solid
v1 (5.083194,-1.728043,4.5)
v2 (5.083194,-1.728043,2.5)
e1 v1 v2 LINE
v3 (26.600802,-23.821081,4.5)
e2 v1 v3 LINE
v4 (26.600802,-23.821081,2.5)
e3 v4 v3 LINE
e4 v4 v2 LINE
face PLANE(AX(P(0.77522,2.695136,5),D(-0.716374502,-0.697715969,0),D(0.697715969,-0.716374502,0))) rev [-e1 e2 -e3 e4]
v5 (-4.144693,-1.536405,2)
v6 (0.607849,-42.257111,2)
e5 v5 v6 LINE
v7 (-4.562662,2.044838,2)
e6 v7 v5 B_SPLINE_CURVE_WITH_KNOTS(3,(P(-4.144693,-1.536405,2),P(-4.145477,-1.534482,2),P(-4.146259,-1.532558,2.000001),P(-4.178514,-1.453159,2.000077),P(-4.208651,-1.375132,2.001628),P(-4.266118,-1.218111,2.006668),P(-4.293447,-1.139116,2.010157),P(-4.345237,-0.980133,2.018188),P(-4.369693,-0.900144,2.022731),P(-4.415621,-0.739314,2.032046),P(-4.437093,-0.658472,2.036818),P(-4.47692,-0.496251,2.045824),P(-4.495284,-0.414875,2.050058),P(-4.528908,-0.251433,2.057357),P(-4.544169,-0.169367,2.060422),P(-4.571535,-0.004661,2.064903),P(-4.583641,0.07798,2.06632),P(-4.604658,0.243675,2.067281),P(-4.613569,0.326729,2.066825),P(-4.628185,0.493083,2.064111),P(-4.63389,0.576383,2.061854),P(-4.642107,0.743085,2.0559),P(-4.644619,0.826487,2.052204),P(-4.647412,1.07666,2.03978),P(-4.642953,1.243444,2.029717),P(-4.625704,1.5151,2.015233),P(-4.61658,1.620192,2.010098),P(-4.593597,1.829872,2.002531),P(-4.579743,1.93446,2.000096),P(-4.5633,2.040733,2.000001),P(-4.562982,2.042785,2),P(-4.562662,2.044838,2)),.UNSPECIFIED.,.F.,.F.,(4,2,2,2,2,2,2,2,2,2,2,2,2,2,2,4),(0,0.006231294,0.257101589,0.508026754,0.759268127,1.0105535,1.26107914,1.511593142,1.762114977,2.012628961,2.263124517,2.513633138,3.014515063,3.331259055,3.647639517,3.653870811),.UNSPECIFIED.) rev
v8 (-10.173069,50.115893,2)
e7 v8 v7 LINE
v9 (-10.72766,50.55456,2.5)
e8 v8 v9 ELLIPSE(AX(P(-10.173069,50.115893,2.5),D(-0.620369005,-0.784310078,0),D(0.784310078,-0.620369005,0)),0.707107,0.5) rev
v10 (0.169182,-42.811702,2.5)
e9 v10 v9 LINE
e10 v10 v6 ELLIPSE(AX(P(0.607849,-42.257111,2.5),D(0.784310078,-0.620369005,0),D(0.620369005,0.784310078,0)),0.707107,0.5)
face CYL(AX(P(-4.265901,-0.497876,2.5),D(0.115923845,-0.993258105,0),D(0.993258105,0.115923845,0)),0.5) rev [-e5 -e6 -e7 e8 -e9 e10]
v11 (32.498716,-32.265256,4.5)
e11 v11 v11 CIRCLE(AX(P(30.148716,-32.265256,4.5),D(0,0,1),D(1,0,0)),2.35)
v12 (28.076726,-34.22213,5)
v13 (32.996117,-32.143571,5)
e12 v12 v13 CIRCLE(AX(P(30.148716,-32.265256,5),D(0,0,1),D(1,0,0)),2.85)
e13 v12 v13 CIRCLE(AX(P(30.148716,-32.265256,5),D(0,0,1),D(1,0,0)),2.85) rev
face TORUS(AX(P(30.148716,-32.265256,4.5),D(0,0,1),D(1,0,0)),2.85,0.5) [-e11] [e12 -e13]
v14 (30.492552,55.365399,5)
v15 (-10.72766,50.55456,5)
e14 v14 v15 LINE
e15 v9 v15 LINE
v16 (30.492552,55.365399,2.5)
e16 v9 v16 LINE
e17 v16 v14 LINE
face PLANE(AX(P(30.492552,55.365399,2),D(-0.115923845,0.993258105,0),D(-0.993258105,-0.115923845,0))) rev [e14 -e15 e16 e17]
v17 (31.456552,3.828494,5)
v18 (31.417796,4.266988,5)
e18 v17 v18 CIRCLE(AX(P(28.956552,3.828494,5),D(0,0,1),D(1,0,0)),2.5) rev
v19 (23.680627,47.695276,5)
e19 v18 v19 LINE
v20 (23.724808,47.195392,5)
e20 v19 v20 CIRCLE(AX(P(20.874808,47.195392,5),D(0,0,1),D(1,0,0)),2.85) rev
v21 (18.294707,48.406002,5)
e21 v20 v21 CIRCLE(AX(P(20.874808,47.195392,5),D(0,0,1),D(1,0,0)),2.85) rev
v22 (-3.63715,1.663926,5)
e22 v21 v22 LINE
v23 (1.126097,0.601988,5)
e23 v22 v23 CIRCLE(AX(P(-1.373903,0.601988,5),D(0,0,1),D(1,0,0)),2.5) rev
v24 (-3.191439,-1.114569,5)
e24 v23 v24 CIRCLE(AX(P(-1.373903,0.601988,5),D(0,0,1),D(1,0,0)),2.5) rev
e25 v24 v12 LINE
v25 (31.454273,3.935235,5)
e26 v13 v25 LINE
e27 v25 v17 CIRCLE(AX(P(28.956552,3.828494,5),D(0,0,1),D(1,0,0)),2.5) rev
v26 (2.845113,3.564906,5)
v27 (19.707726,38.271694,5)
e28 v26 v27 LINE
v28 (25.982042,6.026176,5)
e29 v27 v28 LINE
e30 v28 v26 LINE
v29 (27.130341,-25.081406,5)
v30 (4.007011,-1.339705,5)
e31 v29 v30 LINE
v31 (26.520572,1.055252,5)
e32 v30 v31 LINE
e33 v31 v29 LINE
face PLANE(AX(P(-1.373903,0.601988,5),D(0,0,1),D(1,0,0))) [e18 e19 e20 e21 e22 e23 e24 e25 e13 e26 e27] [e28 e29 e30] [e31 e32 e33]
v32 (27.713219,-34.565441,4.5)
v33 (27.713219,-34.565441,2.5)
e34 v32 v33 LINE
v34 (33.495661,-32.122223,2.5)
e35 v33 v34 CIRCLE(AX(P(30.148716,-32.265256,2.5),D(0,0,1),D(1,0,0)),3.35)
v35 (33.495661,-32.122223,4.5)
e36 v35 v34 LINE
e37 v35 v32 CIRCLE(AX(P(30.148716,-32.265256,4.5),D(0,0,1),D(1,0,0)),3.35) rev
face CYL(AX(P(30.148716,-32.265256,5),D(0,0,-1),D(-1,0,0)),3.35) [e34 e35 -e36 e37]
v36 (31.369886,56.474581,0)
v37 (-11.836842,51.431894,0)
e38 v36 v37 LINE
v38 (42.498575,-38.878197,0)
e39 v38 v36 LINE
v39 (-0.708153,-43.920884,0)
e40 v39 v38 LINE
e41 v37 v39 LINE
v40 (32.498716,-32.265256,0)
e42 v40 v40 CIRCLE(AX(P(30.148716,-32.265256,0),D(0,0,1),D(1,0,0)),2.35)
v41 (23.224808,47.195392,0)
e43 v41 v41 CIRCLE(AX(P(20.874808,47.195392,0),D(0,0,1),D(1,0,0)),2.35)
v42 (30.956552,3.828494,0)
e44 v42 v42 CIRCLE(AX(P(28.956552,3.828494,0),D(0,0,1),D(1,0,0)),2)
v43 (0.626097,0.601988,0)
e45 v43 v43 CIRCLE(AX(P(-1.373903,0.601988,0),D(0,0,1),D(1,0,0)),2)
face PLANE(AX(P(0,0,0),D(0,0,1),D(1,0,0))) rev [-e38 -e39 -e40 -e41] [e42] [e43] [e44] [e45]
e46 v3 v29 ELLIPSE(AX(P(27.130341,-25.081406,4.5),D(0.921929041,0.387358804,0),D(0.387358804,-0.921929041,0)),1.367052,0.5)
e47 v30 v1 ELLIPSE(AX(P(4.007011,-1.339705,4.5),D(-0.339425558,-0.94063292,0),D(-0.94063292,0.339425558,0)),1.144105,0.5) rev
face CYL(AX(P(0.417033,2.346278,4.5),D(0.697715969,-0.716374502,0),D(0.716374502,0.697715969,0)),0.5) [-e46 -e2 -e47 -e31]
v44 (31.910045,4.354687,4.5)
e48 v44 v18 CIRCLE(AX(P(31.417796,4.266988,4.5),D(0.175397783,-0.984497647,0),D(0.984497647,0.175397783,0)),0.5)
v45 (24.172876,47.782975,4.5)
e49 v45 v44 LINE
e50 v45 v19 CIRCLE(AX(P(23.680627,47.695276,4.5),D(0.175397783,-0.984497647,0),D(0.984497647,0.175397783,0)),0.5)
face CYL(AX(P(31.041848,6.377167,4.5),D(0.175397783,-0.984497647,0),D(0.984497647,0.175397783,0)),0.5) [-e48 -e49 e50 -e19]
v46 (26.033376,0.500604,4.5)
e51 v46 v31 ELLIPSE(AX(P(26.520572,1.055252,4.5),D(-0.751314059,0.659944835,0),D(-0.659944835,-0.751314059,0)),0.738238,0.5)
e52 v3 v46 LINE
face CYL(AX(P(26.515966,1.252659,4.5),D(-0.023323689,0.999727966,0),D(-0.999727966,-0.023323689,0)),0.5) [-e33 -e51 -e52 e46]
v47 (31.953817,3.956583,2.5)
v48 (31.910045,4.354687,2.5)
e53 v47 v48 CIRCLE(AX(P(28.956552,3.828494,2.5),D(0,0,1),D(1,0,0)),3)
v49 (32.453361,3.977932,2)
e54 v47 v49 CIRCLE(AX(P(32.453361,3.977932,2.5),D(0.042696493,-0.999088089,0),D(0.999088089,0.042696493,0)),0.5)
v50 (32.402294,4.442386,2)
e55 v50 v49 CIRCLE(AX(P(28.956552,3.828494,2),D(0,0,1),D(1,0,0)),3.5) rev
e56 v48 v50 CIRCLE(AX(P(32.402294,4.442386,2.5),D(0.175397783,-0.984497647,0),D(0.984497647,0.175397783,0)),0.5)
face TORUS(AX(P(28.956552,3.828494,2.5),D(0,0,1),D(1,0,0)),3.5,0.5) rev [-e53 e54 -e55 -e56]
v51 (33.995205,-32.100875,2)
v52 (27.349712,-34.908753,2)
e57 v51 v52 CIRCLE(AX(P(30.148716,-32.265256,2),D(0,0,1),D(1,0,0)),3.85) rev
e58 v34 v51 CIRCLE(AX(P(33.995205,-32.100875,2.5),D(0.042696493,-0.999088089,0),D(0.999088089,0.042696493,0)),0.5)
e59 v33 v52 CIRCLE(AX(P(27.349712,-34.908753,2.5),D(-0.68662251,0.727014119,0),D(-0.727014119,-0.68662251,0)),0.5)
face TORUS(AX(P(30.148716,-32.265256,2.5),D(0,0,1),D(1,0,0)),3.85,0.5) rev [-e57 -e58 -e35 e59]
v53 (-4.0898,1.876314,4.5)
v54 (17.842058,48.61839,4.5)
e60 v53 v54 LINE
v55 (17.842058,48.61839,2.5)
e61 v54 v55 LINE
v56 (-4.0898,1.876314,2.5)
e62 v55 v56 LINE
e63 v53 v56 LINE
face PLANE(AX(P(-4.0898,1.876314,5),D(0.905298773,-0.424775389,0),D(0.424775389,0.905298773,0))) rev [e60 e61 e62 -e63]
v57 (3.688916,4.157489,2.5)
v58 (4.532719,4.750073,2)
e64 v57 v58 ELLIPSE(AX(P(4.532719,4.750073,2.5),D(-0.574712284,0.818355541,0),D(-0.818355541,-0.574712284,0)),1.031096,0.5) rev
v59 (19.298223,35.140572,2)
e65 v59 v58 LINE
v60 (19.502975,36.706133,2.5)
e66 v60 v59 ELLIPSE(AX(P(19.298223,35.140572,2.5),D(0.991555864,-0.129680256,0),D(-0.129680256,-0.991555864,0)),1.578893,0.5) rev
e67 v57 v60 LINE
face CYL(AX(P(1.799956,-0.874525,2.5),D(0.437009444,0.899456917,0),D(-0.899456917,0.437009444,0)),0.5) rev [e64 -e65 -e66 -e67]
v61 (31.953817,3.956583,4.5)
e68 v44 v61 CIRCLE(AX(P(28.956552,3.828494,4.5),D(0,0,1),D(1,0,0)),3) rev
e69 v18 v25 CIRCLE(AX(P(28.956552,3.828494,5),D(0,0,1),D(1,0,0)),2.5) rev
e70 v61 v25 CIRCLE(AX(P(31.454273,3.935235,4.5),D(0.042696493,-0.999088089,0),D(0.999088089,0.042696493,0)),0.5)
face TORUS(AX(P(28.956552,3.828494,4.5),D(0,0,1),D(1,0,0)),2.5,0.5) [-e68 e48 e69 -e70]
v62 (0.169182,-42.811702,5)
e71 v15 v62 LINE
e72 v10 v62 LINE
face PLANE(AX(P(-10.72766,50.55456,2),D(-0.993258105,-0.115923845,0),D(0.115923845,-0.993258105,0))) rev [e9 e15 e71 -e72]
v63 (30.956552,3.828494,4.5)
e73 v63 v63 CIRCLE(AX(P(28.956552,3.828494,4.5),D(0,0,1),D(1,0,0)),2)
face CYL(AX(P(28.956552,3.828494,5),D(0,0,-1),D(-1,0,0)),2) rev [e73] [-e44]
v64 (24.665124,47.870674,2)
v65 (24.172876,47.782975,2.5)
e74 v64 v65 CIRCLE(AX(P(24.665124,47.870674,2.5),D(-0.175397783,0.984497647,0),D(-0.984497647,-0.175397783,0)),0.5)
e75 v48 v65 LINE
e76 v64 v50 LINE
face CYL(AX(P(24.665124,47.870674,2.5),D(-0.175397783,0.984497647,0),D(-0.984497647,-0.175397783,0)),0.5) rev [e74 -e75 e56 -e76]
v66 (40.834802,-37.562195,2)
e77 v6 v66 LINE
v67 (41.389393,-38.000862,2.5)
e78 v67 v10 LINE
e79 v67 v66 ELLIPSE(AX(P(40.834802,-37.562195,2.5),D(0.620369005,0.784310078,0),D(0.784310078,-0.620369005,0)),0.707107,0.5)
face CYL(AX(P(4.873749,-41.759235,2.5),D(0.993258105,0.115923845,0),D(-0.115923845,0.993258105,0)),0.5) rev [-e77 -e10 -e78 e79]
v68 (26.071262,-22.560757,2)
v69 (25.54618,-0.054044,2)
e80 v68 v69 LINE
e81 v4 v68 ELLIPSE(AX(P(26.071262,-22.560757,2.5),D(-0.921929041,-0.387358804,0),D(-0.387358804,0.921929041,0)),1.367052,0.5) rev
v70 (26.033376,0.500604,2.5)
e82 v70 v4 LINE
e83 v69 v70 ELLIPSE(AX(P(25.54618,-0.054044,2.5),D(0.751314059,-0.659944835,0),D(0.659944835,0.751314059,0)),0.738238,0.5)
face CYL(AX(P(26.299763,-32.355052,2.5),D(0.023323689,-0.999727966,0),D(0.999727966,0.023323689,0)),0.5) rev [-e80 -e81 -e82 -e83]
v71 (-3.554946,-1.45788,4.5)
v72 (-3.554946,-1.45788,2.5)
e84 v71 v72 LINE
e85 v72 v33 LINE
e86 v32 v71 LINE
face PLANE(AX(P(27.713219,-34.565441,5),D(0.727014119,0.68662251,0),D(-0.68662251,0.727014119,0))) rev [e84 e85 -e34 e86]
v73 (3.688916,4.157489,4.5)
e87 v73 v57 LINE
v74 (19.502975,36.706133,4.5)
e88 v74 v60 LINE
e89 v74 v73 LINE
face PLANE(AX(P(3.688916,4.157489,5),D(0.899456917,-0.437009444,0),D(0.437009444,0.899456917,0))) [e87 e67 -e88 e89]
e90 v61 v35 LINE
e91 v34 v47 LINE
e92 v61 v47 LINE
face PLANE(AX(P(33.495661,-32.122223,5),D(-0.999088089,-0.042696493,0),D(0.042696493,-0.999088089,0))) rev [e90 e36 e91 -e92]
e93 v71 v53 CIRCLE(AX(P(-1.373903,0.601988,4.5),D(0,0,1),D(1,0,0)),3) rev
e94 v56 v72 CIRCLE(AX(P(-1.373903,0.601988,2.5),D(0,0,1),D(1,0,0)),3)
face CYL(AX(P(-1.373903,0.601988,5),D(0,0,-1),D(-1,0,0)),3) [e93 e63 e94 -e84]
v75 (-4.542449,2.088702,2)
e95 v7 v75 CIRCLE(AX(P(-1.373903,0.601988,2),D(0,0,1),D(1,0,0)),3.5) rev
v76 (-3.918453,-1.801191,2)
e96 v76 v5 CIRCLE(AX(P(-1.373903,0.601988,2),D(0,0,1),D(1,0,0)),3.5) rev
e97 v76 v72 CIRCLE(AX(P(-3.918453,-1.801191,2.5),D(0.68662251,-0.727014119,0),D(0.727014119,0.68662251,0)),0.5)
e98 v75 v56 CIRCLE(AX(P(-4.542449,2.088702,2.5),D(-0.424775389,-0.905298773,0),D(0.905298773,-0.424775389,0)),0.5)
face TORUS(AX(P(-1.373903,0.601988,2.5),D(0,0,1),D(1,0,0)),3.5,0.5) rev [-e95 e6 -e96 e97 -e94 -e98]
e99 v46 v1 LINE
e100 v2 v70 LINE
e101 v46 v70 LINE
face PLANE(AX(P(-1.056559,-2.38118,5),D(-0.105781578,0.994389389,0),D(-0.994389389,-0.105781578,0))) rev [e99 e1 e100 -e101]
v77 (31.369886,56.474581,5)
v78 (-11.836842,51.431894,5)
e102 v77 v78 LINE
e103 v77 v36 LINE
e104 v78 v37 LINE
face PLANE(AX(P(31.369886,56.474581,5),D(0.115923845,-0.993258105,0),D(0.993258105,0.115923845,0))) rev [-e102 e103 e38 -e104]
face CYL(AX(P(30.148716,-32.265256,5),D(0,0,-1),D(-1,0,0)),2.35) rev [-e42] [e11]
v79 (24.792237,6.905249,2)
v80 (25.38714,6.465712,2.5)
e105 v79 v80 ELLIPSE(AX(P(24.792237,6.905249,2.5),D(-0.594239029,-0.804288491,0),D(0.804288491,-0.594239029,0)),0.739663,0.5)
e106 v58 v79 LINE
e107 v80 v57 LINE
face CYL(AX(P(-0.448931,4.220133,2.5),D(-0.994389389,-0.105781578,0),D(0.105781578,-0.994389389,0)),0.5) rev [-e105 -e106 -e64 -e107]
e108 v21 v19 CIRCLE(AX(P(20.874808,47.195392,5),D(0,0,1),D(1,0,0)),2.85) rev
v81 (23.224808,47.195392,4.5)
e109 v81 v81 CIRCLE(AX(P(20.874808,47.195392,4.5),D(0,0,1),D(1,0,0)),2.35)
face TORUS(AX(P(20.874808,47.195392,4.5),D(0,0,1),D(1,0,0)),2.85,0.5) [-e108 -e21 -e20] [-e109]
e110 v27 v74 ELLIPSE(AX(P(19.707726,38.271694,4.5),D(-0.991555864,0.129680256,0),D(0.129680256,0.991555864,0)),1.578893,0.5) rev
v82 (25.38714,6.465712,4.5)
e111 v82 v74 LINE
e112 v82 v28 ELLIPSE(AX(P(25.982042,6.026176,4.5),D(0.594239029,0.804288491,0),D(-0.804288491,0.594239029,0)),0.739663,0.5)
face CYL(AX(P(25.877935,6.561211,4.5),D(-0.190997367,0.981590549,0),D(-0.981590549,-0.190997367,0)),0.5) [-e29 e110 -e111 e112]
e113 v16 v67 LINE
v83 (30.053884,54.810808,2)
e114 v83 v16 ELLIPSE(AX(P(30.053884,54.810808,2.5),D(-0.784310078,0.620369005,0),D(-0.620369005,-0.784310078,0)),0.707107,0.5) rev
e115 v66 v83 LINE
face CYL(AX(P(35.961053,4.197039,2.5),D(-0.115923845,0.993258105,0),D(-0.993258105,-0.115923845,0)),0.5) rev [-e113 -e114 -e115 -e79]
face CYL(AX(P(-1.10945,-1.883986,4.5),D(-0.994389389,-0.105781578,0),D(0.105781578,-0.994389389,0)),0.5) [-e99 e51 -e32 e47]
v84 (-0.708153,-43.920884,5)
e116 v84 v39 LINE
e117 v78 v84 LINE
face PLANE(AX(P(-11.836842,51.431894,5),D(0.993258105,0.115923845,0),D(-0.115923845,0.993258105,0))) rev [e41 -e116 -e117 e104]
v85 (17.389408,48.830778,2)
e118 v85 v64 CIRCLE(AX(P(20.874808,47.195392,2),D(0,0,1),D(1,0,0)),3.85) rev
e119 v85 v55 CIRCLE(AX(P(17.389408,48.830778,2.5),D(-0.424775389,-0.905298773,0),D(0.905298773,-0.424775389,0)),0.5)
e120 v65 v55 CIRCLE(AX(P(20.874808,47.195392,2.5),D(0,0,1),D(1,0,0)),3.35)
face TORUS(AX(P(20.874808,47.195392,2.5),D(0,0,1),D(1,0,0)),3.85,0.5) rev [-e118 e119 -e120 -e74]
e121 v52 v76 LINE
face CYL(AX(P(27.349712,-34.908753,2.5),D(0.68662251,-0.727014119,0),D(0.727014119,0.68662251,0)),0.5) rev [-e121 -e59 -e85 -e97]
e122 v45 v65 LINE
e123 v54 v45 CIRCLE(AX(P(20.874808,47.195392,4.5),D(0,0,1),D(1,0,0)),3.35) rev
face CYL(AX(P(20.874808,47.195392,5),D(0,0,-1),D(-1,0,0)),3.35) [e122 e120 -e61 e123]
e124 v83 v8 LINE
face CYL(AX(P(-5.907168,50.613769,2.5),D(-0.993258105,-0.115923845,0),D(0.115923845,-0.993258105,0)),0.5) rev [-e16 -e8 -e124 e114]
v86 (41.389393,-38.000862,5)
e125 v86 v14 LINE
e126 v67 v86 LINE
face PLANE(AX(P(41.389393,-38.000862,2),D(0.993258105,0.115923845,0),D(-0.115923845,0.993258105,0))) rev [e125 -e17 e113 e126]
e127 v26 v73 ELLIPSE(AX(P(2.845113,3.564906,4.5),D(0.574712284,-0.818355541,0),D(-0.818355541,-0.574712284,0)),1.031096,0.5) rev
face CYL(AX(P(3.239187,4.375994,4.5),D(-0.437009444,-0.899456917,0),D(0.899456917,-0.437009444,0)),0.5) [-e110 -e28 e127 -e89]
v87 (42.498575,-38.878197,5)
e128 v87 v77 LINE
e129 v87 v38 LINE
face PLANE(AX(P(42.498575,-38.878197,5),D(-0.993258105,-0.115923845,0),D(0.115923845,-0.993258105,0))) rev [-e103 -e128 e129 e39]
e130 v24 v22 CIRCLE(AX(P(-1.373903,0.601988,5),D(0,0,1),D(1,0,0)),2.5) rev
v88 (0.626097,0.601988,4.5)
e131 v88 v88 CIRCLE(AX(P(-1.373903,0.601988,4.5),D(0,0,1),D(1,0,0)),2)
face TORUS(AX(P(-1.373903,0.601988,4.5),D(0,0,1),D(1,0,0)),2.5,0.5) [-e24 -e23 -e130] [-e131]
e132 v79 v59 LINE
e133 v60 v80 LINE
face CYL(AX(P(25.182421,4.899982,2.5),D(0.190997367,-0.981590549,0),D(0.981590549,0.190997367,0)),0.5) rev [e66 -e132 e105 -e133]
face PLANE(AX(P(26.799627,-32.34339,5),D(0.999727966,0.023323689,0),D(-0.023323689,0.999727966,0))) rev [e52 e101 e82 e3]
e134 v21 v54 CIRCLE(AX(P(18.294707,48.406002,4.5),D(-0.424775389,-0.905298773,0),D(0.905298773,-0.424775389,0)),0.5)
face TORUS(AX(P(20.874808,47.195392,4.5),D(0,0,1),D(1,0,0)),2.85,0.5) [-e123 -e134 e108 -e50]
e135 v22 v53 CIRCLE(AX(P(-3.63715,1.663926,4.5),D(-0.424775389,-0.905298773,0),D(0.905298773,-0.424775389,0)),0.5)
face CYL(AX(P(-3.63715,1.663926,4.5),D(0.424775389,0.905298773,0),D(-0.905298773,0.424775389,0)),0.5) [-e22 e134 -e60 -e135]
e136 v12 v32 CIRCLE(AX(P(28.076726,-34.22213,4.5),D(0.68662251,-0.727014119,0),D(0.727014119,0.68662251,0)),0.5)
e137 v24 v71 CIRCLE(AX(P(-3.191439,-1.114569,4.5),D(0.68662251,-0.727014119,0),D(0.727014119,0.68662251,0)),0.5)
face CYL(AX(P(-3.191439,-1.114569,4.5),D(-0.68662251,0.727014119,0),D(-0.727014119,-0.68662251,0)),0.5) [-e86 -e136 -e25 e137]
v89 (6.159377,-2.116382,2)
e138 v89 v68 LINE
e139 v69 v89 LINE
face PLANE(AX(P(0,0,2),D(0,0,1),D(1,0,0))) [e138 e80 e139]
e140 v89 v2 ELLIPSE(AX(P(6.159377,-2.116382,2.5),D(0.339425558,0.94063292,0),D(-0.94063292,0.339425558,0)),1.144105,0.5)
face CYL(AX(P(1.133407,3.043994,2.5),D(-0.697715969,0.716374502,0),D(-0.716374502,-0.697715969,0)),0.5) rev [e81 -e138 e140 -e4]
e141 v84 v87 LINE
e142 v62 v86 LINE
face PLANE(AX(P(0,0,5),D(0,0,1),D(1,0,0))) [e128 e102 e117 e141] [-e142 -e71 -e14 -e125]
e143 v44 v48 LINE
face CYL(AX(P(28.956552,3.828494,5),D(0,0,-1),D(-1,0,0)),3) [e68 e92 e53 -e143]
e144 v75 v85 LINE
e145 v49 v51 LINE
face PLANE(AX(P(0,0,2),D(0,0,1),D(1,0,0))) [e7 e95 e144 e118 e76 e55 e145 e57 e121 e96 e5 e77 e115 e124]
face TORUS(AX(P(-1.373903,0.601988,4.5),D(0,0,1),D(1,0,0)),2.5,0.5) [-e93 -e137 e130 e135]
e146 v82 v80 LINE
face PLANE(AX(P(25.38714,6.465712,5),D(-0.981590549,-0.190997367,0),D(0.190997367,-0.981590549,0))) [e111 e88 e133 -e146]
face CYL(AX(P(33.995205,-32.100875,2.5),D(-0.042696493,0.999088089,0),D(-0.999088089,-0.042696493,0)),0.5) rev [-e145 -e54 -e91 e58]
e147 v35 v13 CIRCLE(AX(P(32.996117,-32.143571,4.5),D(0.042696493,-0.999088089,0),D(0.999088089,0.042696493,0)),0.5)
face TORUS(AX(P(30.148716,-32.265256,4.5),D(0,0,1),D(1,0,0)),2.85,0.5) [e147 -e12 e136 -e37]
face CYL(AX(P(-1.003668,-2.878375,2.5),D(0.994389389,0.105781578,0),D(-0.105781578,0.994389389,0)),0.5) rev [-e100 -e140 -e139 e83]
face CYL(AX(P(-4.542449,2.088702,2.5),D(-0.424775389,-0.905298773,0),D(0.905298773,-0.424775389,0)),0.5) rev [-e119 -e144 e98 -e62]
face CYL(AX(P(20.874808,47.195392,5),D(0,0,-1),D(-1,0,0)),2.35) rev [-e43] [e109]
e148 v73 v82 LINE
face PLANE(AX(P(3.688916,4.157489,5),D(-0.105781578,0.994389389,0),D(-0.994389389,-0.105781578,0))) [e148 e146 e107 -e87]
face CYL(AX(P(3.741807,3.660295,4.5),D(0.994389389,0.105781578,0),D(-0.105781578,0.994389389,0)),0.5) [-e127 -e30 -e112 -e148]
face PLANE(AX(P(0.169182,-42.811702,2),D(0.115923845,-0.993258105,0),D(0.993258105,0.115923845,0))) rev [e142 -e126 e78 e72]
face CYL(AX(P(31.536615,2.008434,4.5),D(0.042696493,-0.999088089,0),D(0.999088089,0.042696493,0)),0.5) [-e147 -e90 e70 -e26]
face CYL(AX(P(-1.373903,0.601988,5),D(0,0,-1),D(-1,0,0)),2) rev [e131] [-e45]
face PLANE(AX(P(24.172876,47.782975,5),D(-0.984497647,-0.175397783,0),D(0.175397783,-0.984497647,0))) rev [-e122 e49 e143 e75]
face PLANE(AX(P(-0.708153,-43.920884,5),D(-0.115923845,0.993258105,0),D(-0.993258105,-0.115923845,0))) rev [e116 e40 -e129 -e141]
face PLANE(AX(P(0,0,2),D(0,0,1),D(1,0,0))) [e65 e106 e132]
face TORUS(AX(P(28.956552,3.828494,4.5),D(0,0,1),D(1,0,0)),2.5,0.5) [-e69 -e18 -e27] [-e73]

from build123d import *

# Parameters (mm, degrees)
ESQUISSE1_R             = 2
ESQUISSE1_R_2           = 2.35
BOSS_EXTRU_1_DEPTH      = 5
ENL_V_MAT_EXTRU_1_DEPTH = 3
ESQUISSE4_R             = 3
ESQUISSE4_R_2           = 2
ESQUISSE4_R_3           = 3.35
ESQUISSE4_R_4           = 2.35
BOSS_EXTRU_3_DEPTH      = 3
BOSS_EXTRU_4_DEPTH      = 3
ESQUISSE6_R             = 2.5
BOSS_EXTRU_7_DEPTH      = 3
CONG_1_R                = 0.5
CONG_2_R                = 0.5
CONG_3_R                = 0.5
CONG_4_R                = 0.5


# Some blends are built 0.0001 mm under size
with BuildPart() as part:
    # Esquisse1 → Boss.-Extru.1 (new body)
    with BuildSketch(Plane.XY):
        Polygon((31.369885856, 56.474581367), (-11.836841692, 51.431894124), (-0.708152605, -43.920883912), (42.498574943, -38.87819667), align=None)
        with Locations((-1.373903483, 0.601987724)):
            Circle(ESQUISSE1_R, mode=Mode.SUBTRACT)
        with Locations((28.956552282, 3.828493866)):
            Circle(ESQUISSE1_R, mode=Mode.SUBTRACT)
        with Locations((20.874808411, 47.195392317)):
            Circle(ESQUISSE1_R_2, mode=Mode.SUBTRACT)
        with Locations((30.148715983, -32.265256047)):
            Circle(ESQUISSE1_R_2, mode=Mode.SUBTRACT)
    extrude(amount=BOSS_EXTRU_1_DEPTH)

    # Esquisse3 → Enlèv. mat.-Extru.1 (cut)
    with BuildSketch(Plane.XY.offset(5)):
        Polygon((0.169181655, -42.811701963), (41.389392993, -38.00086241), (30.492551596, 55.365399417), (-10.727659743, 50.554559864), align=None)
    extrude(amount=-ENL_V_MAT_EXTRU_1_DEPTH, mode=Mode.SUBTRACT)

    # Esquisse4 → Boss.-Extru.3 (add)
    # profile 1 of 4: a face of its own
    with BuildSketch(Plane.XY.offset(2)):
        with Locations((-1.373903483, 0.601987724)):
            Circle(ESQUISSE4_R)
        with Locations((-1.373903483, 0.601987724)):
            Circle(ESQUISSE4_R_2, mode=Mode.SUBTRACT)
    # profile 2 of 4: a face of its own
    with BuildSketch(Plane.XY.offset(2)):
        with Locations((30.148715983, -32.265256047)):
            Circle(ESQUISSE4_R_3)
        with Locations((30.148715983, -32.265256047)):
            Circle(ESQUISSE4_R_4, mode=Mode.SUBTRACT)
    # profile 3 of 4: a face of its own
    with BuildSketch(Plane.XY.offset(2)):
        with Locations((28.956552282, 3.828493866)):
            Circle(ESQUISSE4_R)
        with Locations((28.956552282, 3.828493866)):
            Circle(ESQUISSE4_R_2, mode=Mode.SUBTRACT)
    # profile 4 of 4: a face of its own
    with BuildSketch(Plane.XY.offset(2)):
        with Locations((20.874808411, 47.195392317)):
            Circle(ESQUISSE4_R_3)
        with Locations((20.874808411, 47.195392317)):
            Circle(ESQUISSE4_R_4, mode=Mode.SUBTRACT)
    extrude(amount=BOSS_EXTRU_3_DEPTH)

    # Esquisse5 → Boss.-Extru.4 (add)
    with BuildSketch(Plane.XY.offset(2)):
        with BuildLine():
            Line((27.713218685, -34.565441455), (-3.554945839, -1.457879806))
            ThreePointArc((-3.554945839, -1.457879806), (0.702665564, -1.563159152), (0.775220023, 2.695135629))
            Line((0.775220023, 2.695135629), (32.548570565, -29.927907552))
            ThreePointArc((32.548570565, -29.927907552), (27.829880548, -29.847508702), (27.713218685, -34.565441455))
        make_face()
    extrude(amount=BOSS_EXTRU_4_DEPTH)

    # Esquisse6 → Boss.-Extru.7 (add)
    with BuildSketch(Plane.XY.offset(2)):
        with BuildLine():
            Line((33.495661081, -32.122222794), (31.953816549, 3.956583346))
            Line((31.953816549, 3.956583346), (31.910045224, 4.354687214))
            Line((31.910045224, 4.354687214), (24.17287553, 47.782974889))
            ThreePointArc((24.17287553, 47.782974889), (20.436541684, 43.874184362), (17.842057521, 48.618389871))
            Line((17.842057521, 48.618389871), (-4.089799802, 1.876313892))
            ThreePointArc((-4.089799802, 1.876313892), (1.069419445, 2.342726954), (-1.056558749, -2.381180445))
            Line((-1.056558749, -2.381180445), (26.033375742, 0.500604146))
            Line((26.033375742, 0.500604146), (26.799627298, -32.343390404))
            ThreePointArc((26.799627298, -32.343390404), (30.038126984, -28.917081907), (33.495661081, -32.122222794))
        make_face()
        with Locations((28.956552282, 3.828493866)):
            Circle(ESQUISSE6_R, mode=Mode.SUBTRACT)
        Polygon((3.688915715, 4.157489262), (25.387139604, 6.465712166), (19.502974618, 36.706132963), align=None, mode=Mode.SUBTRACT)
    extrude(amount=BOSS_EXTRU_7_DEPTH)

    # Congé1
    cong_1_edges = [part.edges().sort_by_distance(p)[0] for p in [
        (-4.33603346, 0.126818282, 5),
        (28.041460377, 26.068831051, 5),
        (6.876128859, 25.247351882, 5),
        (15.558284743, -0.613719547, 5),
        (26.317088635, -11.660238657, 5),
        (32.724738815, -14.082819724, 5),
        (11.595945167, 20.431811112, 5),
        (14.538027659, 5.311600714, 5),
        (22.445057111, 21.585922564, 5),
        (-3.373903483, 0.601987724, 5),
        (27.798715983, -32.265256047, 5),
        (31.938581711, 4.156366535, 5),
        (26.956552282, 3.828493866, 5),
        (21.313075137, 50.516600271, 5),
        (18.524808411, 47.195392317, 5),
        (31.452561691, -35.351108663, 5),
        (12.079136423, -18.011660631, 5),
        (15.841997636, -12.77456235, 5),
    ]]
    fillet(cong_1_edges, radius=CONG_1_R - 0.0001)  # a hair under: the kernel refuses the full size

    # Congé2
    cong_2_edges = [part.edges().sort_by_distance(p)[0] for p in [
        (11.595945167, 20.431811112, 2),
        (14.538027659, 5.311600714, 2),
        (22.445057111, 21.585922564, 2),
    ]]
    fillet(cong_2_edges, radius=CONG_2_R)

    # Congé3
    cong_3_edges = [part.edges().sort_by_distance(p)[0] for p in [
        (15.558284743, -0.613719547, 2),
        (26.317088635, -11.660238657, 2),
        (15.841997636, -12.77456235, 2),
    ]]
    fillet(cong_3_edges, radius=CONG_3_R)

    # Congé4
    # the kernel refuses this fillet: 0.5 mm, written as the material it adds along each edge
    with BuildSketch(Plane(origin=(-1.373903483, 0.601987724, 2), x_dir=(-0.9052987730853533, 0.42477538941204424, 0), z_dir=(0.42477538941204424, 0.9052987730853533, 0))) as cong_4_piece_1:
        with BuildLine():
            CenterArc((3 + CONG_4_R, CONG_4_R), CONG_4_R, 180, 90)
            Line((3 + CONG_4_R, 0), (3, 0))
            Line((3, 0), (3, CONG_4_R))
        make_face()
    revolve(axis=Axis((-1.373903483, 0.601987724, 2), (0, 0, 1)), revolution_arc=68.499789457)
    with BuildSketch(Plane(origin=(33.495661081, -32.122222794, 2), x_dir=(0, 0, 1), z_dir=(-0.042696493365929934, 0.9990880889362325, 0))) as cong_4_piece_2:
        with BuildLine():
            CenterArc((CONG_4_R, CONG_4_R), CONG_4_R, 180, 90)
            Line((0, CONG_4_R), (0, 0))
            Line((0, 0), (CONG_4_R, 0))
        make_face()
    extrude(amount=36.111736833)
    with BuildSketch(Plane(origin=(31.910045224, 4.354687214, 2), x_dir=(0, 0, 1), z_dir=(-0.17539778265308498, 0.9844976474529441, 0))) as cong_4_piece_3:
        with BuildLine():
            CenterArc((CONG_4_R, CONG_4_R), CONG_4_R, 180, 90)
            Line((0, CONG_4_R), (0, 0))
            Line((0, 0), (CONG_4_R, 0))
        make_face()
    extrude(amount=44.112129457)
    with BuildSketch(Plane(origin=(17.842057521, 48.618389871, 2), x_dir=(0, 0, 1), z_dir=(-0.4247753894120441, -0.9052987730853534, 0))) as cong_4_piece_4:
        with BuildLine():
            CenterArc((CONG_4_R, CONG_4_R), CONG_4_R, 180, 90)
            Line((0, CONG_4_R), (0, 0))
            Line((0, 0), (CONG_4_R, 0))
        make_face()
    extrude(amount=51.63165727)
    with BuildSketch(Plane(origin=(41.534297799, -39.24243504, 2), x_dir=(-0.9932581045430172, -0.1159238446550701, 0), z_dir=(-0.1159238446550701, 0.9932581045430172, 0))) as cong_4_piece_5_section:
        with BuildLine():
            CenterArc((CONG_4_R, CONG_4_R), CONG_4_R, 180, 90)
            Line((0, CONG_4_R), (0, 0))
            Line((0, 0), (CONG_4_R, 0))
        make_face()
    cong_4_piece_5 = extrude(amount=96.5, mode=Mode.PRIVATE)
    cong_4_piece_5 = split(cong_4_piece_5, bisect_by=Plane(origin=(30.265696743, 56.345710687, 2.111683969), z_dir=(0.11592384465507002, -0.9932581045430172, 0)), keep=Keep.TOP, mode=Mode.PRIVATE)
    cong_4_piece_5 = split(cong_4_piece_5, bisect_by=Plane(origin=(41.39438583, -39.007067349, 2.111683969), z_dir=(-0.11592384465507001, 0.9932581045430172, 0)), keep=Keep.TOP, mode=Mode.PRIVATE)
    add(cong_4_piece_5)
    with BuildSketch(Plane(origin=(-1.072390976, -42.956606769, 2), x_dir=(-0.11592384465506991, 0.9932581045430172, 0), z_dir=(0.9932581045430172, 0.11592384465506991, 0))) as cong_4_piece_6_section:
        with BuildLine():
            CenterArc((CONG_4_R, CONG_4_R), CONG_4_R, 180, 90)
            Line((0, CONG_4_R), (0, 0))
            Line((0, 0), (CONG_4_R, 0))
        make_face()
    cong_4_piece_6 = extrude(amount=44, mode=Mode.PRIVATE)
    cong_4_piece_6 = split(cong_4_piece_6, bisect_by=Plane(origin=(-0.837023285, -42.8166948, 2.111683969), z_dir=(0.9932581045430172, 0.11592384465507, 0)), keep=Keep.TOP, mode=Mode.PRIVATE)
    cong_4_piece_6 = split(cong_4_piece_6, bisect_by=Plane(origin=(42.369704263, -37.774007557, 2.111683969), z_dir=(-0.9932581045430172, -0.11592384465507008, 0)), keep=Keep.TOP, mode=Mode.PRIVATE)
    add(cong_4_piece_6)
    with BuildSketch(Plane(origin=(-10.872564549, 51.796132495, 2), x_dir=(0.9932581045430172, 0.11592384465507, 0), z_dir=(0.11592384465507, -0.9932581045430172, 0))) as cong_4_piece_7_section:
        with BuildLine():
            CenterArc((CONG_4_R, CONG_4_R), CONG_4_R, 180, 90)
            Line((0, CONG_4_R), (0, 0))
            Line((0, 0), (CONG_4_R, 0))
        make_face()
    cong_4_piece_7 = extrude(amount=96.5, mode=Mode.PRIVATE)
    cong_4_piece_7 = split(cong_4_piece_7, bisect_by=Plane(origin=(-10.73265258, 51.560764804, 2.111683969), z_dir=(0.11592384465507002, -0.9932581045430172, 0)), keep=Keep.TOP, mode=Mode.PRIVATE)
    cong_4_piece_7 = split(cong_4_piece_7, bisect_by=Plane(origin=(0.396036507, -43.792013232, 2.111683969), z_dir=(-0.11592384465507001, 0.9932581045430172, 0)), keep=Keep.TOP, mode=Mode.PRIVATE)
    add(cong_4_piece_7)
    with BuildSketch(Plane(origin=(31.734124226, 55.510304223, 2), x_dir=(0.11592384465506991, -0.9932581045430172, 0), z_dir=(-0.9932581045430172, -0.11592384465506993, 0))) as cong_4_piece_8_section:
        with BuildLine():
            CenterArc((CONG_4_R, CONG_4_R), CONG_4_R, 180, 90)
            Line((0, CONG_4_R), (0, 0))
            Line((0, 0), (CONG_4_R, 0))
        make_face()
    cong_4_piece_8 = extrude(amount=44, mode=Mode.PRIVATE)
    cong_4_piece_8 = split(cong_4_piece_8, bisect_by=Plane(origin=(-11.707971012, 50.327705012, 2.111683969), z_dir=(0.9932581045430172, 0.11592384465507, 0)), keep=Keep.TOP, mode=Mode.PRIVATE)
    cong_4_piece_8 = split(cong_4_piece_8, bisect_by=Plane(origin=(31.498756535, 55.370392254, 2.111683969), z_dir=(-0.9932581045430172, -0.11592384465507008, 0)), keep=Keep.TOP, mode=Mode.PRIVATE)
    add(cong_4_piece_8)
    with BuildSketch(Plane(origin=(28.956552282, 3.828493866, 2), x_dir=(0.9990880889362325, 0.042696493365931974, 0), z_dir=(0.042696493365931974, -0.9990880889362325, 0))) as cong_4_piece_9:
        with BuildLine():
            CenterArc((3 + CONG_4_R, CONG_4_R), CONG_4_R, 180, 90)
            Line((3 + CONG_4_R, 0), (3, 0))
            Line((3, 0), (3, CONG_4_R))
        make_face()
    revolve(axis=Axis((28.956552282, 3.828493866, 2), (0, 0, 1)), revolution_arc=7.654734672)
    with BuildSketch(Plane(origin=(20.874808411, 47.195392317, 2), x_dir=(0.9844976474529449, 0.17539778265307968, 0), z_dir=(0.17539778265307968, -0.9844976474529449, 0))) as cong_4_piece_10:
        with BuildLine():
            CenterArc((3.35 + CONG_4_R, CONG_4_R), CONG_4_R, 180, 90)
            Line((3.35 + CONG_4_R, 0), (3.35, 0))
            Line((3.35, 0), (3.35, CONG_4_R))
        make_face()
    revolve(axis=Axis((20.874808411, 47.195392317, 2), (0, 0, 1)), revolution_arc=144.761745451)
    with BuildSketch(Plane(origin=(30.148715983, -32.265256047, 2), x_dir=(0.9990880889362325, 0.0426964933659299, 0), z_dir=(-0.0426964933659299, 0.9990880889362325, 0))) as cong_4_piece_11:
        with BuildLine():
            CenterArc((3.35 + CONG_4_R, -CONG_4_R), CONG_4_R, 90, 90)
            Line((3.35 + CONG_4_R, 0), (3.35, 0))
            Line((3.35, 0), (3.35, -CONG_4_R))
        make_face()
    revolve(axis=Axis((30.148715983, -32.265256047, 2), (0, 0, -1)), revolution_arc=139.08373042)
    with BuildSketch(Plane(origin=(27.713218685, -34.565441455, 2), x_dir=(0, 0, 1), z_dir=(-0.6866225099236372, 0.727014118752975, 0))) as cong_4_piece_12:
        with BuildLine():
            CenterArc((CONG_4_R, -CONG_4_R), CONG_4_R, 90, 90)
            Line((0, -CONG_4_R), (0, 0))
            Line((0, 0), (CONG_4_R, 0))
        make_face()
    extrude(amount=45.539090363)


solid = part.part
